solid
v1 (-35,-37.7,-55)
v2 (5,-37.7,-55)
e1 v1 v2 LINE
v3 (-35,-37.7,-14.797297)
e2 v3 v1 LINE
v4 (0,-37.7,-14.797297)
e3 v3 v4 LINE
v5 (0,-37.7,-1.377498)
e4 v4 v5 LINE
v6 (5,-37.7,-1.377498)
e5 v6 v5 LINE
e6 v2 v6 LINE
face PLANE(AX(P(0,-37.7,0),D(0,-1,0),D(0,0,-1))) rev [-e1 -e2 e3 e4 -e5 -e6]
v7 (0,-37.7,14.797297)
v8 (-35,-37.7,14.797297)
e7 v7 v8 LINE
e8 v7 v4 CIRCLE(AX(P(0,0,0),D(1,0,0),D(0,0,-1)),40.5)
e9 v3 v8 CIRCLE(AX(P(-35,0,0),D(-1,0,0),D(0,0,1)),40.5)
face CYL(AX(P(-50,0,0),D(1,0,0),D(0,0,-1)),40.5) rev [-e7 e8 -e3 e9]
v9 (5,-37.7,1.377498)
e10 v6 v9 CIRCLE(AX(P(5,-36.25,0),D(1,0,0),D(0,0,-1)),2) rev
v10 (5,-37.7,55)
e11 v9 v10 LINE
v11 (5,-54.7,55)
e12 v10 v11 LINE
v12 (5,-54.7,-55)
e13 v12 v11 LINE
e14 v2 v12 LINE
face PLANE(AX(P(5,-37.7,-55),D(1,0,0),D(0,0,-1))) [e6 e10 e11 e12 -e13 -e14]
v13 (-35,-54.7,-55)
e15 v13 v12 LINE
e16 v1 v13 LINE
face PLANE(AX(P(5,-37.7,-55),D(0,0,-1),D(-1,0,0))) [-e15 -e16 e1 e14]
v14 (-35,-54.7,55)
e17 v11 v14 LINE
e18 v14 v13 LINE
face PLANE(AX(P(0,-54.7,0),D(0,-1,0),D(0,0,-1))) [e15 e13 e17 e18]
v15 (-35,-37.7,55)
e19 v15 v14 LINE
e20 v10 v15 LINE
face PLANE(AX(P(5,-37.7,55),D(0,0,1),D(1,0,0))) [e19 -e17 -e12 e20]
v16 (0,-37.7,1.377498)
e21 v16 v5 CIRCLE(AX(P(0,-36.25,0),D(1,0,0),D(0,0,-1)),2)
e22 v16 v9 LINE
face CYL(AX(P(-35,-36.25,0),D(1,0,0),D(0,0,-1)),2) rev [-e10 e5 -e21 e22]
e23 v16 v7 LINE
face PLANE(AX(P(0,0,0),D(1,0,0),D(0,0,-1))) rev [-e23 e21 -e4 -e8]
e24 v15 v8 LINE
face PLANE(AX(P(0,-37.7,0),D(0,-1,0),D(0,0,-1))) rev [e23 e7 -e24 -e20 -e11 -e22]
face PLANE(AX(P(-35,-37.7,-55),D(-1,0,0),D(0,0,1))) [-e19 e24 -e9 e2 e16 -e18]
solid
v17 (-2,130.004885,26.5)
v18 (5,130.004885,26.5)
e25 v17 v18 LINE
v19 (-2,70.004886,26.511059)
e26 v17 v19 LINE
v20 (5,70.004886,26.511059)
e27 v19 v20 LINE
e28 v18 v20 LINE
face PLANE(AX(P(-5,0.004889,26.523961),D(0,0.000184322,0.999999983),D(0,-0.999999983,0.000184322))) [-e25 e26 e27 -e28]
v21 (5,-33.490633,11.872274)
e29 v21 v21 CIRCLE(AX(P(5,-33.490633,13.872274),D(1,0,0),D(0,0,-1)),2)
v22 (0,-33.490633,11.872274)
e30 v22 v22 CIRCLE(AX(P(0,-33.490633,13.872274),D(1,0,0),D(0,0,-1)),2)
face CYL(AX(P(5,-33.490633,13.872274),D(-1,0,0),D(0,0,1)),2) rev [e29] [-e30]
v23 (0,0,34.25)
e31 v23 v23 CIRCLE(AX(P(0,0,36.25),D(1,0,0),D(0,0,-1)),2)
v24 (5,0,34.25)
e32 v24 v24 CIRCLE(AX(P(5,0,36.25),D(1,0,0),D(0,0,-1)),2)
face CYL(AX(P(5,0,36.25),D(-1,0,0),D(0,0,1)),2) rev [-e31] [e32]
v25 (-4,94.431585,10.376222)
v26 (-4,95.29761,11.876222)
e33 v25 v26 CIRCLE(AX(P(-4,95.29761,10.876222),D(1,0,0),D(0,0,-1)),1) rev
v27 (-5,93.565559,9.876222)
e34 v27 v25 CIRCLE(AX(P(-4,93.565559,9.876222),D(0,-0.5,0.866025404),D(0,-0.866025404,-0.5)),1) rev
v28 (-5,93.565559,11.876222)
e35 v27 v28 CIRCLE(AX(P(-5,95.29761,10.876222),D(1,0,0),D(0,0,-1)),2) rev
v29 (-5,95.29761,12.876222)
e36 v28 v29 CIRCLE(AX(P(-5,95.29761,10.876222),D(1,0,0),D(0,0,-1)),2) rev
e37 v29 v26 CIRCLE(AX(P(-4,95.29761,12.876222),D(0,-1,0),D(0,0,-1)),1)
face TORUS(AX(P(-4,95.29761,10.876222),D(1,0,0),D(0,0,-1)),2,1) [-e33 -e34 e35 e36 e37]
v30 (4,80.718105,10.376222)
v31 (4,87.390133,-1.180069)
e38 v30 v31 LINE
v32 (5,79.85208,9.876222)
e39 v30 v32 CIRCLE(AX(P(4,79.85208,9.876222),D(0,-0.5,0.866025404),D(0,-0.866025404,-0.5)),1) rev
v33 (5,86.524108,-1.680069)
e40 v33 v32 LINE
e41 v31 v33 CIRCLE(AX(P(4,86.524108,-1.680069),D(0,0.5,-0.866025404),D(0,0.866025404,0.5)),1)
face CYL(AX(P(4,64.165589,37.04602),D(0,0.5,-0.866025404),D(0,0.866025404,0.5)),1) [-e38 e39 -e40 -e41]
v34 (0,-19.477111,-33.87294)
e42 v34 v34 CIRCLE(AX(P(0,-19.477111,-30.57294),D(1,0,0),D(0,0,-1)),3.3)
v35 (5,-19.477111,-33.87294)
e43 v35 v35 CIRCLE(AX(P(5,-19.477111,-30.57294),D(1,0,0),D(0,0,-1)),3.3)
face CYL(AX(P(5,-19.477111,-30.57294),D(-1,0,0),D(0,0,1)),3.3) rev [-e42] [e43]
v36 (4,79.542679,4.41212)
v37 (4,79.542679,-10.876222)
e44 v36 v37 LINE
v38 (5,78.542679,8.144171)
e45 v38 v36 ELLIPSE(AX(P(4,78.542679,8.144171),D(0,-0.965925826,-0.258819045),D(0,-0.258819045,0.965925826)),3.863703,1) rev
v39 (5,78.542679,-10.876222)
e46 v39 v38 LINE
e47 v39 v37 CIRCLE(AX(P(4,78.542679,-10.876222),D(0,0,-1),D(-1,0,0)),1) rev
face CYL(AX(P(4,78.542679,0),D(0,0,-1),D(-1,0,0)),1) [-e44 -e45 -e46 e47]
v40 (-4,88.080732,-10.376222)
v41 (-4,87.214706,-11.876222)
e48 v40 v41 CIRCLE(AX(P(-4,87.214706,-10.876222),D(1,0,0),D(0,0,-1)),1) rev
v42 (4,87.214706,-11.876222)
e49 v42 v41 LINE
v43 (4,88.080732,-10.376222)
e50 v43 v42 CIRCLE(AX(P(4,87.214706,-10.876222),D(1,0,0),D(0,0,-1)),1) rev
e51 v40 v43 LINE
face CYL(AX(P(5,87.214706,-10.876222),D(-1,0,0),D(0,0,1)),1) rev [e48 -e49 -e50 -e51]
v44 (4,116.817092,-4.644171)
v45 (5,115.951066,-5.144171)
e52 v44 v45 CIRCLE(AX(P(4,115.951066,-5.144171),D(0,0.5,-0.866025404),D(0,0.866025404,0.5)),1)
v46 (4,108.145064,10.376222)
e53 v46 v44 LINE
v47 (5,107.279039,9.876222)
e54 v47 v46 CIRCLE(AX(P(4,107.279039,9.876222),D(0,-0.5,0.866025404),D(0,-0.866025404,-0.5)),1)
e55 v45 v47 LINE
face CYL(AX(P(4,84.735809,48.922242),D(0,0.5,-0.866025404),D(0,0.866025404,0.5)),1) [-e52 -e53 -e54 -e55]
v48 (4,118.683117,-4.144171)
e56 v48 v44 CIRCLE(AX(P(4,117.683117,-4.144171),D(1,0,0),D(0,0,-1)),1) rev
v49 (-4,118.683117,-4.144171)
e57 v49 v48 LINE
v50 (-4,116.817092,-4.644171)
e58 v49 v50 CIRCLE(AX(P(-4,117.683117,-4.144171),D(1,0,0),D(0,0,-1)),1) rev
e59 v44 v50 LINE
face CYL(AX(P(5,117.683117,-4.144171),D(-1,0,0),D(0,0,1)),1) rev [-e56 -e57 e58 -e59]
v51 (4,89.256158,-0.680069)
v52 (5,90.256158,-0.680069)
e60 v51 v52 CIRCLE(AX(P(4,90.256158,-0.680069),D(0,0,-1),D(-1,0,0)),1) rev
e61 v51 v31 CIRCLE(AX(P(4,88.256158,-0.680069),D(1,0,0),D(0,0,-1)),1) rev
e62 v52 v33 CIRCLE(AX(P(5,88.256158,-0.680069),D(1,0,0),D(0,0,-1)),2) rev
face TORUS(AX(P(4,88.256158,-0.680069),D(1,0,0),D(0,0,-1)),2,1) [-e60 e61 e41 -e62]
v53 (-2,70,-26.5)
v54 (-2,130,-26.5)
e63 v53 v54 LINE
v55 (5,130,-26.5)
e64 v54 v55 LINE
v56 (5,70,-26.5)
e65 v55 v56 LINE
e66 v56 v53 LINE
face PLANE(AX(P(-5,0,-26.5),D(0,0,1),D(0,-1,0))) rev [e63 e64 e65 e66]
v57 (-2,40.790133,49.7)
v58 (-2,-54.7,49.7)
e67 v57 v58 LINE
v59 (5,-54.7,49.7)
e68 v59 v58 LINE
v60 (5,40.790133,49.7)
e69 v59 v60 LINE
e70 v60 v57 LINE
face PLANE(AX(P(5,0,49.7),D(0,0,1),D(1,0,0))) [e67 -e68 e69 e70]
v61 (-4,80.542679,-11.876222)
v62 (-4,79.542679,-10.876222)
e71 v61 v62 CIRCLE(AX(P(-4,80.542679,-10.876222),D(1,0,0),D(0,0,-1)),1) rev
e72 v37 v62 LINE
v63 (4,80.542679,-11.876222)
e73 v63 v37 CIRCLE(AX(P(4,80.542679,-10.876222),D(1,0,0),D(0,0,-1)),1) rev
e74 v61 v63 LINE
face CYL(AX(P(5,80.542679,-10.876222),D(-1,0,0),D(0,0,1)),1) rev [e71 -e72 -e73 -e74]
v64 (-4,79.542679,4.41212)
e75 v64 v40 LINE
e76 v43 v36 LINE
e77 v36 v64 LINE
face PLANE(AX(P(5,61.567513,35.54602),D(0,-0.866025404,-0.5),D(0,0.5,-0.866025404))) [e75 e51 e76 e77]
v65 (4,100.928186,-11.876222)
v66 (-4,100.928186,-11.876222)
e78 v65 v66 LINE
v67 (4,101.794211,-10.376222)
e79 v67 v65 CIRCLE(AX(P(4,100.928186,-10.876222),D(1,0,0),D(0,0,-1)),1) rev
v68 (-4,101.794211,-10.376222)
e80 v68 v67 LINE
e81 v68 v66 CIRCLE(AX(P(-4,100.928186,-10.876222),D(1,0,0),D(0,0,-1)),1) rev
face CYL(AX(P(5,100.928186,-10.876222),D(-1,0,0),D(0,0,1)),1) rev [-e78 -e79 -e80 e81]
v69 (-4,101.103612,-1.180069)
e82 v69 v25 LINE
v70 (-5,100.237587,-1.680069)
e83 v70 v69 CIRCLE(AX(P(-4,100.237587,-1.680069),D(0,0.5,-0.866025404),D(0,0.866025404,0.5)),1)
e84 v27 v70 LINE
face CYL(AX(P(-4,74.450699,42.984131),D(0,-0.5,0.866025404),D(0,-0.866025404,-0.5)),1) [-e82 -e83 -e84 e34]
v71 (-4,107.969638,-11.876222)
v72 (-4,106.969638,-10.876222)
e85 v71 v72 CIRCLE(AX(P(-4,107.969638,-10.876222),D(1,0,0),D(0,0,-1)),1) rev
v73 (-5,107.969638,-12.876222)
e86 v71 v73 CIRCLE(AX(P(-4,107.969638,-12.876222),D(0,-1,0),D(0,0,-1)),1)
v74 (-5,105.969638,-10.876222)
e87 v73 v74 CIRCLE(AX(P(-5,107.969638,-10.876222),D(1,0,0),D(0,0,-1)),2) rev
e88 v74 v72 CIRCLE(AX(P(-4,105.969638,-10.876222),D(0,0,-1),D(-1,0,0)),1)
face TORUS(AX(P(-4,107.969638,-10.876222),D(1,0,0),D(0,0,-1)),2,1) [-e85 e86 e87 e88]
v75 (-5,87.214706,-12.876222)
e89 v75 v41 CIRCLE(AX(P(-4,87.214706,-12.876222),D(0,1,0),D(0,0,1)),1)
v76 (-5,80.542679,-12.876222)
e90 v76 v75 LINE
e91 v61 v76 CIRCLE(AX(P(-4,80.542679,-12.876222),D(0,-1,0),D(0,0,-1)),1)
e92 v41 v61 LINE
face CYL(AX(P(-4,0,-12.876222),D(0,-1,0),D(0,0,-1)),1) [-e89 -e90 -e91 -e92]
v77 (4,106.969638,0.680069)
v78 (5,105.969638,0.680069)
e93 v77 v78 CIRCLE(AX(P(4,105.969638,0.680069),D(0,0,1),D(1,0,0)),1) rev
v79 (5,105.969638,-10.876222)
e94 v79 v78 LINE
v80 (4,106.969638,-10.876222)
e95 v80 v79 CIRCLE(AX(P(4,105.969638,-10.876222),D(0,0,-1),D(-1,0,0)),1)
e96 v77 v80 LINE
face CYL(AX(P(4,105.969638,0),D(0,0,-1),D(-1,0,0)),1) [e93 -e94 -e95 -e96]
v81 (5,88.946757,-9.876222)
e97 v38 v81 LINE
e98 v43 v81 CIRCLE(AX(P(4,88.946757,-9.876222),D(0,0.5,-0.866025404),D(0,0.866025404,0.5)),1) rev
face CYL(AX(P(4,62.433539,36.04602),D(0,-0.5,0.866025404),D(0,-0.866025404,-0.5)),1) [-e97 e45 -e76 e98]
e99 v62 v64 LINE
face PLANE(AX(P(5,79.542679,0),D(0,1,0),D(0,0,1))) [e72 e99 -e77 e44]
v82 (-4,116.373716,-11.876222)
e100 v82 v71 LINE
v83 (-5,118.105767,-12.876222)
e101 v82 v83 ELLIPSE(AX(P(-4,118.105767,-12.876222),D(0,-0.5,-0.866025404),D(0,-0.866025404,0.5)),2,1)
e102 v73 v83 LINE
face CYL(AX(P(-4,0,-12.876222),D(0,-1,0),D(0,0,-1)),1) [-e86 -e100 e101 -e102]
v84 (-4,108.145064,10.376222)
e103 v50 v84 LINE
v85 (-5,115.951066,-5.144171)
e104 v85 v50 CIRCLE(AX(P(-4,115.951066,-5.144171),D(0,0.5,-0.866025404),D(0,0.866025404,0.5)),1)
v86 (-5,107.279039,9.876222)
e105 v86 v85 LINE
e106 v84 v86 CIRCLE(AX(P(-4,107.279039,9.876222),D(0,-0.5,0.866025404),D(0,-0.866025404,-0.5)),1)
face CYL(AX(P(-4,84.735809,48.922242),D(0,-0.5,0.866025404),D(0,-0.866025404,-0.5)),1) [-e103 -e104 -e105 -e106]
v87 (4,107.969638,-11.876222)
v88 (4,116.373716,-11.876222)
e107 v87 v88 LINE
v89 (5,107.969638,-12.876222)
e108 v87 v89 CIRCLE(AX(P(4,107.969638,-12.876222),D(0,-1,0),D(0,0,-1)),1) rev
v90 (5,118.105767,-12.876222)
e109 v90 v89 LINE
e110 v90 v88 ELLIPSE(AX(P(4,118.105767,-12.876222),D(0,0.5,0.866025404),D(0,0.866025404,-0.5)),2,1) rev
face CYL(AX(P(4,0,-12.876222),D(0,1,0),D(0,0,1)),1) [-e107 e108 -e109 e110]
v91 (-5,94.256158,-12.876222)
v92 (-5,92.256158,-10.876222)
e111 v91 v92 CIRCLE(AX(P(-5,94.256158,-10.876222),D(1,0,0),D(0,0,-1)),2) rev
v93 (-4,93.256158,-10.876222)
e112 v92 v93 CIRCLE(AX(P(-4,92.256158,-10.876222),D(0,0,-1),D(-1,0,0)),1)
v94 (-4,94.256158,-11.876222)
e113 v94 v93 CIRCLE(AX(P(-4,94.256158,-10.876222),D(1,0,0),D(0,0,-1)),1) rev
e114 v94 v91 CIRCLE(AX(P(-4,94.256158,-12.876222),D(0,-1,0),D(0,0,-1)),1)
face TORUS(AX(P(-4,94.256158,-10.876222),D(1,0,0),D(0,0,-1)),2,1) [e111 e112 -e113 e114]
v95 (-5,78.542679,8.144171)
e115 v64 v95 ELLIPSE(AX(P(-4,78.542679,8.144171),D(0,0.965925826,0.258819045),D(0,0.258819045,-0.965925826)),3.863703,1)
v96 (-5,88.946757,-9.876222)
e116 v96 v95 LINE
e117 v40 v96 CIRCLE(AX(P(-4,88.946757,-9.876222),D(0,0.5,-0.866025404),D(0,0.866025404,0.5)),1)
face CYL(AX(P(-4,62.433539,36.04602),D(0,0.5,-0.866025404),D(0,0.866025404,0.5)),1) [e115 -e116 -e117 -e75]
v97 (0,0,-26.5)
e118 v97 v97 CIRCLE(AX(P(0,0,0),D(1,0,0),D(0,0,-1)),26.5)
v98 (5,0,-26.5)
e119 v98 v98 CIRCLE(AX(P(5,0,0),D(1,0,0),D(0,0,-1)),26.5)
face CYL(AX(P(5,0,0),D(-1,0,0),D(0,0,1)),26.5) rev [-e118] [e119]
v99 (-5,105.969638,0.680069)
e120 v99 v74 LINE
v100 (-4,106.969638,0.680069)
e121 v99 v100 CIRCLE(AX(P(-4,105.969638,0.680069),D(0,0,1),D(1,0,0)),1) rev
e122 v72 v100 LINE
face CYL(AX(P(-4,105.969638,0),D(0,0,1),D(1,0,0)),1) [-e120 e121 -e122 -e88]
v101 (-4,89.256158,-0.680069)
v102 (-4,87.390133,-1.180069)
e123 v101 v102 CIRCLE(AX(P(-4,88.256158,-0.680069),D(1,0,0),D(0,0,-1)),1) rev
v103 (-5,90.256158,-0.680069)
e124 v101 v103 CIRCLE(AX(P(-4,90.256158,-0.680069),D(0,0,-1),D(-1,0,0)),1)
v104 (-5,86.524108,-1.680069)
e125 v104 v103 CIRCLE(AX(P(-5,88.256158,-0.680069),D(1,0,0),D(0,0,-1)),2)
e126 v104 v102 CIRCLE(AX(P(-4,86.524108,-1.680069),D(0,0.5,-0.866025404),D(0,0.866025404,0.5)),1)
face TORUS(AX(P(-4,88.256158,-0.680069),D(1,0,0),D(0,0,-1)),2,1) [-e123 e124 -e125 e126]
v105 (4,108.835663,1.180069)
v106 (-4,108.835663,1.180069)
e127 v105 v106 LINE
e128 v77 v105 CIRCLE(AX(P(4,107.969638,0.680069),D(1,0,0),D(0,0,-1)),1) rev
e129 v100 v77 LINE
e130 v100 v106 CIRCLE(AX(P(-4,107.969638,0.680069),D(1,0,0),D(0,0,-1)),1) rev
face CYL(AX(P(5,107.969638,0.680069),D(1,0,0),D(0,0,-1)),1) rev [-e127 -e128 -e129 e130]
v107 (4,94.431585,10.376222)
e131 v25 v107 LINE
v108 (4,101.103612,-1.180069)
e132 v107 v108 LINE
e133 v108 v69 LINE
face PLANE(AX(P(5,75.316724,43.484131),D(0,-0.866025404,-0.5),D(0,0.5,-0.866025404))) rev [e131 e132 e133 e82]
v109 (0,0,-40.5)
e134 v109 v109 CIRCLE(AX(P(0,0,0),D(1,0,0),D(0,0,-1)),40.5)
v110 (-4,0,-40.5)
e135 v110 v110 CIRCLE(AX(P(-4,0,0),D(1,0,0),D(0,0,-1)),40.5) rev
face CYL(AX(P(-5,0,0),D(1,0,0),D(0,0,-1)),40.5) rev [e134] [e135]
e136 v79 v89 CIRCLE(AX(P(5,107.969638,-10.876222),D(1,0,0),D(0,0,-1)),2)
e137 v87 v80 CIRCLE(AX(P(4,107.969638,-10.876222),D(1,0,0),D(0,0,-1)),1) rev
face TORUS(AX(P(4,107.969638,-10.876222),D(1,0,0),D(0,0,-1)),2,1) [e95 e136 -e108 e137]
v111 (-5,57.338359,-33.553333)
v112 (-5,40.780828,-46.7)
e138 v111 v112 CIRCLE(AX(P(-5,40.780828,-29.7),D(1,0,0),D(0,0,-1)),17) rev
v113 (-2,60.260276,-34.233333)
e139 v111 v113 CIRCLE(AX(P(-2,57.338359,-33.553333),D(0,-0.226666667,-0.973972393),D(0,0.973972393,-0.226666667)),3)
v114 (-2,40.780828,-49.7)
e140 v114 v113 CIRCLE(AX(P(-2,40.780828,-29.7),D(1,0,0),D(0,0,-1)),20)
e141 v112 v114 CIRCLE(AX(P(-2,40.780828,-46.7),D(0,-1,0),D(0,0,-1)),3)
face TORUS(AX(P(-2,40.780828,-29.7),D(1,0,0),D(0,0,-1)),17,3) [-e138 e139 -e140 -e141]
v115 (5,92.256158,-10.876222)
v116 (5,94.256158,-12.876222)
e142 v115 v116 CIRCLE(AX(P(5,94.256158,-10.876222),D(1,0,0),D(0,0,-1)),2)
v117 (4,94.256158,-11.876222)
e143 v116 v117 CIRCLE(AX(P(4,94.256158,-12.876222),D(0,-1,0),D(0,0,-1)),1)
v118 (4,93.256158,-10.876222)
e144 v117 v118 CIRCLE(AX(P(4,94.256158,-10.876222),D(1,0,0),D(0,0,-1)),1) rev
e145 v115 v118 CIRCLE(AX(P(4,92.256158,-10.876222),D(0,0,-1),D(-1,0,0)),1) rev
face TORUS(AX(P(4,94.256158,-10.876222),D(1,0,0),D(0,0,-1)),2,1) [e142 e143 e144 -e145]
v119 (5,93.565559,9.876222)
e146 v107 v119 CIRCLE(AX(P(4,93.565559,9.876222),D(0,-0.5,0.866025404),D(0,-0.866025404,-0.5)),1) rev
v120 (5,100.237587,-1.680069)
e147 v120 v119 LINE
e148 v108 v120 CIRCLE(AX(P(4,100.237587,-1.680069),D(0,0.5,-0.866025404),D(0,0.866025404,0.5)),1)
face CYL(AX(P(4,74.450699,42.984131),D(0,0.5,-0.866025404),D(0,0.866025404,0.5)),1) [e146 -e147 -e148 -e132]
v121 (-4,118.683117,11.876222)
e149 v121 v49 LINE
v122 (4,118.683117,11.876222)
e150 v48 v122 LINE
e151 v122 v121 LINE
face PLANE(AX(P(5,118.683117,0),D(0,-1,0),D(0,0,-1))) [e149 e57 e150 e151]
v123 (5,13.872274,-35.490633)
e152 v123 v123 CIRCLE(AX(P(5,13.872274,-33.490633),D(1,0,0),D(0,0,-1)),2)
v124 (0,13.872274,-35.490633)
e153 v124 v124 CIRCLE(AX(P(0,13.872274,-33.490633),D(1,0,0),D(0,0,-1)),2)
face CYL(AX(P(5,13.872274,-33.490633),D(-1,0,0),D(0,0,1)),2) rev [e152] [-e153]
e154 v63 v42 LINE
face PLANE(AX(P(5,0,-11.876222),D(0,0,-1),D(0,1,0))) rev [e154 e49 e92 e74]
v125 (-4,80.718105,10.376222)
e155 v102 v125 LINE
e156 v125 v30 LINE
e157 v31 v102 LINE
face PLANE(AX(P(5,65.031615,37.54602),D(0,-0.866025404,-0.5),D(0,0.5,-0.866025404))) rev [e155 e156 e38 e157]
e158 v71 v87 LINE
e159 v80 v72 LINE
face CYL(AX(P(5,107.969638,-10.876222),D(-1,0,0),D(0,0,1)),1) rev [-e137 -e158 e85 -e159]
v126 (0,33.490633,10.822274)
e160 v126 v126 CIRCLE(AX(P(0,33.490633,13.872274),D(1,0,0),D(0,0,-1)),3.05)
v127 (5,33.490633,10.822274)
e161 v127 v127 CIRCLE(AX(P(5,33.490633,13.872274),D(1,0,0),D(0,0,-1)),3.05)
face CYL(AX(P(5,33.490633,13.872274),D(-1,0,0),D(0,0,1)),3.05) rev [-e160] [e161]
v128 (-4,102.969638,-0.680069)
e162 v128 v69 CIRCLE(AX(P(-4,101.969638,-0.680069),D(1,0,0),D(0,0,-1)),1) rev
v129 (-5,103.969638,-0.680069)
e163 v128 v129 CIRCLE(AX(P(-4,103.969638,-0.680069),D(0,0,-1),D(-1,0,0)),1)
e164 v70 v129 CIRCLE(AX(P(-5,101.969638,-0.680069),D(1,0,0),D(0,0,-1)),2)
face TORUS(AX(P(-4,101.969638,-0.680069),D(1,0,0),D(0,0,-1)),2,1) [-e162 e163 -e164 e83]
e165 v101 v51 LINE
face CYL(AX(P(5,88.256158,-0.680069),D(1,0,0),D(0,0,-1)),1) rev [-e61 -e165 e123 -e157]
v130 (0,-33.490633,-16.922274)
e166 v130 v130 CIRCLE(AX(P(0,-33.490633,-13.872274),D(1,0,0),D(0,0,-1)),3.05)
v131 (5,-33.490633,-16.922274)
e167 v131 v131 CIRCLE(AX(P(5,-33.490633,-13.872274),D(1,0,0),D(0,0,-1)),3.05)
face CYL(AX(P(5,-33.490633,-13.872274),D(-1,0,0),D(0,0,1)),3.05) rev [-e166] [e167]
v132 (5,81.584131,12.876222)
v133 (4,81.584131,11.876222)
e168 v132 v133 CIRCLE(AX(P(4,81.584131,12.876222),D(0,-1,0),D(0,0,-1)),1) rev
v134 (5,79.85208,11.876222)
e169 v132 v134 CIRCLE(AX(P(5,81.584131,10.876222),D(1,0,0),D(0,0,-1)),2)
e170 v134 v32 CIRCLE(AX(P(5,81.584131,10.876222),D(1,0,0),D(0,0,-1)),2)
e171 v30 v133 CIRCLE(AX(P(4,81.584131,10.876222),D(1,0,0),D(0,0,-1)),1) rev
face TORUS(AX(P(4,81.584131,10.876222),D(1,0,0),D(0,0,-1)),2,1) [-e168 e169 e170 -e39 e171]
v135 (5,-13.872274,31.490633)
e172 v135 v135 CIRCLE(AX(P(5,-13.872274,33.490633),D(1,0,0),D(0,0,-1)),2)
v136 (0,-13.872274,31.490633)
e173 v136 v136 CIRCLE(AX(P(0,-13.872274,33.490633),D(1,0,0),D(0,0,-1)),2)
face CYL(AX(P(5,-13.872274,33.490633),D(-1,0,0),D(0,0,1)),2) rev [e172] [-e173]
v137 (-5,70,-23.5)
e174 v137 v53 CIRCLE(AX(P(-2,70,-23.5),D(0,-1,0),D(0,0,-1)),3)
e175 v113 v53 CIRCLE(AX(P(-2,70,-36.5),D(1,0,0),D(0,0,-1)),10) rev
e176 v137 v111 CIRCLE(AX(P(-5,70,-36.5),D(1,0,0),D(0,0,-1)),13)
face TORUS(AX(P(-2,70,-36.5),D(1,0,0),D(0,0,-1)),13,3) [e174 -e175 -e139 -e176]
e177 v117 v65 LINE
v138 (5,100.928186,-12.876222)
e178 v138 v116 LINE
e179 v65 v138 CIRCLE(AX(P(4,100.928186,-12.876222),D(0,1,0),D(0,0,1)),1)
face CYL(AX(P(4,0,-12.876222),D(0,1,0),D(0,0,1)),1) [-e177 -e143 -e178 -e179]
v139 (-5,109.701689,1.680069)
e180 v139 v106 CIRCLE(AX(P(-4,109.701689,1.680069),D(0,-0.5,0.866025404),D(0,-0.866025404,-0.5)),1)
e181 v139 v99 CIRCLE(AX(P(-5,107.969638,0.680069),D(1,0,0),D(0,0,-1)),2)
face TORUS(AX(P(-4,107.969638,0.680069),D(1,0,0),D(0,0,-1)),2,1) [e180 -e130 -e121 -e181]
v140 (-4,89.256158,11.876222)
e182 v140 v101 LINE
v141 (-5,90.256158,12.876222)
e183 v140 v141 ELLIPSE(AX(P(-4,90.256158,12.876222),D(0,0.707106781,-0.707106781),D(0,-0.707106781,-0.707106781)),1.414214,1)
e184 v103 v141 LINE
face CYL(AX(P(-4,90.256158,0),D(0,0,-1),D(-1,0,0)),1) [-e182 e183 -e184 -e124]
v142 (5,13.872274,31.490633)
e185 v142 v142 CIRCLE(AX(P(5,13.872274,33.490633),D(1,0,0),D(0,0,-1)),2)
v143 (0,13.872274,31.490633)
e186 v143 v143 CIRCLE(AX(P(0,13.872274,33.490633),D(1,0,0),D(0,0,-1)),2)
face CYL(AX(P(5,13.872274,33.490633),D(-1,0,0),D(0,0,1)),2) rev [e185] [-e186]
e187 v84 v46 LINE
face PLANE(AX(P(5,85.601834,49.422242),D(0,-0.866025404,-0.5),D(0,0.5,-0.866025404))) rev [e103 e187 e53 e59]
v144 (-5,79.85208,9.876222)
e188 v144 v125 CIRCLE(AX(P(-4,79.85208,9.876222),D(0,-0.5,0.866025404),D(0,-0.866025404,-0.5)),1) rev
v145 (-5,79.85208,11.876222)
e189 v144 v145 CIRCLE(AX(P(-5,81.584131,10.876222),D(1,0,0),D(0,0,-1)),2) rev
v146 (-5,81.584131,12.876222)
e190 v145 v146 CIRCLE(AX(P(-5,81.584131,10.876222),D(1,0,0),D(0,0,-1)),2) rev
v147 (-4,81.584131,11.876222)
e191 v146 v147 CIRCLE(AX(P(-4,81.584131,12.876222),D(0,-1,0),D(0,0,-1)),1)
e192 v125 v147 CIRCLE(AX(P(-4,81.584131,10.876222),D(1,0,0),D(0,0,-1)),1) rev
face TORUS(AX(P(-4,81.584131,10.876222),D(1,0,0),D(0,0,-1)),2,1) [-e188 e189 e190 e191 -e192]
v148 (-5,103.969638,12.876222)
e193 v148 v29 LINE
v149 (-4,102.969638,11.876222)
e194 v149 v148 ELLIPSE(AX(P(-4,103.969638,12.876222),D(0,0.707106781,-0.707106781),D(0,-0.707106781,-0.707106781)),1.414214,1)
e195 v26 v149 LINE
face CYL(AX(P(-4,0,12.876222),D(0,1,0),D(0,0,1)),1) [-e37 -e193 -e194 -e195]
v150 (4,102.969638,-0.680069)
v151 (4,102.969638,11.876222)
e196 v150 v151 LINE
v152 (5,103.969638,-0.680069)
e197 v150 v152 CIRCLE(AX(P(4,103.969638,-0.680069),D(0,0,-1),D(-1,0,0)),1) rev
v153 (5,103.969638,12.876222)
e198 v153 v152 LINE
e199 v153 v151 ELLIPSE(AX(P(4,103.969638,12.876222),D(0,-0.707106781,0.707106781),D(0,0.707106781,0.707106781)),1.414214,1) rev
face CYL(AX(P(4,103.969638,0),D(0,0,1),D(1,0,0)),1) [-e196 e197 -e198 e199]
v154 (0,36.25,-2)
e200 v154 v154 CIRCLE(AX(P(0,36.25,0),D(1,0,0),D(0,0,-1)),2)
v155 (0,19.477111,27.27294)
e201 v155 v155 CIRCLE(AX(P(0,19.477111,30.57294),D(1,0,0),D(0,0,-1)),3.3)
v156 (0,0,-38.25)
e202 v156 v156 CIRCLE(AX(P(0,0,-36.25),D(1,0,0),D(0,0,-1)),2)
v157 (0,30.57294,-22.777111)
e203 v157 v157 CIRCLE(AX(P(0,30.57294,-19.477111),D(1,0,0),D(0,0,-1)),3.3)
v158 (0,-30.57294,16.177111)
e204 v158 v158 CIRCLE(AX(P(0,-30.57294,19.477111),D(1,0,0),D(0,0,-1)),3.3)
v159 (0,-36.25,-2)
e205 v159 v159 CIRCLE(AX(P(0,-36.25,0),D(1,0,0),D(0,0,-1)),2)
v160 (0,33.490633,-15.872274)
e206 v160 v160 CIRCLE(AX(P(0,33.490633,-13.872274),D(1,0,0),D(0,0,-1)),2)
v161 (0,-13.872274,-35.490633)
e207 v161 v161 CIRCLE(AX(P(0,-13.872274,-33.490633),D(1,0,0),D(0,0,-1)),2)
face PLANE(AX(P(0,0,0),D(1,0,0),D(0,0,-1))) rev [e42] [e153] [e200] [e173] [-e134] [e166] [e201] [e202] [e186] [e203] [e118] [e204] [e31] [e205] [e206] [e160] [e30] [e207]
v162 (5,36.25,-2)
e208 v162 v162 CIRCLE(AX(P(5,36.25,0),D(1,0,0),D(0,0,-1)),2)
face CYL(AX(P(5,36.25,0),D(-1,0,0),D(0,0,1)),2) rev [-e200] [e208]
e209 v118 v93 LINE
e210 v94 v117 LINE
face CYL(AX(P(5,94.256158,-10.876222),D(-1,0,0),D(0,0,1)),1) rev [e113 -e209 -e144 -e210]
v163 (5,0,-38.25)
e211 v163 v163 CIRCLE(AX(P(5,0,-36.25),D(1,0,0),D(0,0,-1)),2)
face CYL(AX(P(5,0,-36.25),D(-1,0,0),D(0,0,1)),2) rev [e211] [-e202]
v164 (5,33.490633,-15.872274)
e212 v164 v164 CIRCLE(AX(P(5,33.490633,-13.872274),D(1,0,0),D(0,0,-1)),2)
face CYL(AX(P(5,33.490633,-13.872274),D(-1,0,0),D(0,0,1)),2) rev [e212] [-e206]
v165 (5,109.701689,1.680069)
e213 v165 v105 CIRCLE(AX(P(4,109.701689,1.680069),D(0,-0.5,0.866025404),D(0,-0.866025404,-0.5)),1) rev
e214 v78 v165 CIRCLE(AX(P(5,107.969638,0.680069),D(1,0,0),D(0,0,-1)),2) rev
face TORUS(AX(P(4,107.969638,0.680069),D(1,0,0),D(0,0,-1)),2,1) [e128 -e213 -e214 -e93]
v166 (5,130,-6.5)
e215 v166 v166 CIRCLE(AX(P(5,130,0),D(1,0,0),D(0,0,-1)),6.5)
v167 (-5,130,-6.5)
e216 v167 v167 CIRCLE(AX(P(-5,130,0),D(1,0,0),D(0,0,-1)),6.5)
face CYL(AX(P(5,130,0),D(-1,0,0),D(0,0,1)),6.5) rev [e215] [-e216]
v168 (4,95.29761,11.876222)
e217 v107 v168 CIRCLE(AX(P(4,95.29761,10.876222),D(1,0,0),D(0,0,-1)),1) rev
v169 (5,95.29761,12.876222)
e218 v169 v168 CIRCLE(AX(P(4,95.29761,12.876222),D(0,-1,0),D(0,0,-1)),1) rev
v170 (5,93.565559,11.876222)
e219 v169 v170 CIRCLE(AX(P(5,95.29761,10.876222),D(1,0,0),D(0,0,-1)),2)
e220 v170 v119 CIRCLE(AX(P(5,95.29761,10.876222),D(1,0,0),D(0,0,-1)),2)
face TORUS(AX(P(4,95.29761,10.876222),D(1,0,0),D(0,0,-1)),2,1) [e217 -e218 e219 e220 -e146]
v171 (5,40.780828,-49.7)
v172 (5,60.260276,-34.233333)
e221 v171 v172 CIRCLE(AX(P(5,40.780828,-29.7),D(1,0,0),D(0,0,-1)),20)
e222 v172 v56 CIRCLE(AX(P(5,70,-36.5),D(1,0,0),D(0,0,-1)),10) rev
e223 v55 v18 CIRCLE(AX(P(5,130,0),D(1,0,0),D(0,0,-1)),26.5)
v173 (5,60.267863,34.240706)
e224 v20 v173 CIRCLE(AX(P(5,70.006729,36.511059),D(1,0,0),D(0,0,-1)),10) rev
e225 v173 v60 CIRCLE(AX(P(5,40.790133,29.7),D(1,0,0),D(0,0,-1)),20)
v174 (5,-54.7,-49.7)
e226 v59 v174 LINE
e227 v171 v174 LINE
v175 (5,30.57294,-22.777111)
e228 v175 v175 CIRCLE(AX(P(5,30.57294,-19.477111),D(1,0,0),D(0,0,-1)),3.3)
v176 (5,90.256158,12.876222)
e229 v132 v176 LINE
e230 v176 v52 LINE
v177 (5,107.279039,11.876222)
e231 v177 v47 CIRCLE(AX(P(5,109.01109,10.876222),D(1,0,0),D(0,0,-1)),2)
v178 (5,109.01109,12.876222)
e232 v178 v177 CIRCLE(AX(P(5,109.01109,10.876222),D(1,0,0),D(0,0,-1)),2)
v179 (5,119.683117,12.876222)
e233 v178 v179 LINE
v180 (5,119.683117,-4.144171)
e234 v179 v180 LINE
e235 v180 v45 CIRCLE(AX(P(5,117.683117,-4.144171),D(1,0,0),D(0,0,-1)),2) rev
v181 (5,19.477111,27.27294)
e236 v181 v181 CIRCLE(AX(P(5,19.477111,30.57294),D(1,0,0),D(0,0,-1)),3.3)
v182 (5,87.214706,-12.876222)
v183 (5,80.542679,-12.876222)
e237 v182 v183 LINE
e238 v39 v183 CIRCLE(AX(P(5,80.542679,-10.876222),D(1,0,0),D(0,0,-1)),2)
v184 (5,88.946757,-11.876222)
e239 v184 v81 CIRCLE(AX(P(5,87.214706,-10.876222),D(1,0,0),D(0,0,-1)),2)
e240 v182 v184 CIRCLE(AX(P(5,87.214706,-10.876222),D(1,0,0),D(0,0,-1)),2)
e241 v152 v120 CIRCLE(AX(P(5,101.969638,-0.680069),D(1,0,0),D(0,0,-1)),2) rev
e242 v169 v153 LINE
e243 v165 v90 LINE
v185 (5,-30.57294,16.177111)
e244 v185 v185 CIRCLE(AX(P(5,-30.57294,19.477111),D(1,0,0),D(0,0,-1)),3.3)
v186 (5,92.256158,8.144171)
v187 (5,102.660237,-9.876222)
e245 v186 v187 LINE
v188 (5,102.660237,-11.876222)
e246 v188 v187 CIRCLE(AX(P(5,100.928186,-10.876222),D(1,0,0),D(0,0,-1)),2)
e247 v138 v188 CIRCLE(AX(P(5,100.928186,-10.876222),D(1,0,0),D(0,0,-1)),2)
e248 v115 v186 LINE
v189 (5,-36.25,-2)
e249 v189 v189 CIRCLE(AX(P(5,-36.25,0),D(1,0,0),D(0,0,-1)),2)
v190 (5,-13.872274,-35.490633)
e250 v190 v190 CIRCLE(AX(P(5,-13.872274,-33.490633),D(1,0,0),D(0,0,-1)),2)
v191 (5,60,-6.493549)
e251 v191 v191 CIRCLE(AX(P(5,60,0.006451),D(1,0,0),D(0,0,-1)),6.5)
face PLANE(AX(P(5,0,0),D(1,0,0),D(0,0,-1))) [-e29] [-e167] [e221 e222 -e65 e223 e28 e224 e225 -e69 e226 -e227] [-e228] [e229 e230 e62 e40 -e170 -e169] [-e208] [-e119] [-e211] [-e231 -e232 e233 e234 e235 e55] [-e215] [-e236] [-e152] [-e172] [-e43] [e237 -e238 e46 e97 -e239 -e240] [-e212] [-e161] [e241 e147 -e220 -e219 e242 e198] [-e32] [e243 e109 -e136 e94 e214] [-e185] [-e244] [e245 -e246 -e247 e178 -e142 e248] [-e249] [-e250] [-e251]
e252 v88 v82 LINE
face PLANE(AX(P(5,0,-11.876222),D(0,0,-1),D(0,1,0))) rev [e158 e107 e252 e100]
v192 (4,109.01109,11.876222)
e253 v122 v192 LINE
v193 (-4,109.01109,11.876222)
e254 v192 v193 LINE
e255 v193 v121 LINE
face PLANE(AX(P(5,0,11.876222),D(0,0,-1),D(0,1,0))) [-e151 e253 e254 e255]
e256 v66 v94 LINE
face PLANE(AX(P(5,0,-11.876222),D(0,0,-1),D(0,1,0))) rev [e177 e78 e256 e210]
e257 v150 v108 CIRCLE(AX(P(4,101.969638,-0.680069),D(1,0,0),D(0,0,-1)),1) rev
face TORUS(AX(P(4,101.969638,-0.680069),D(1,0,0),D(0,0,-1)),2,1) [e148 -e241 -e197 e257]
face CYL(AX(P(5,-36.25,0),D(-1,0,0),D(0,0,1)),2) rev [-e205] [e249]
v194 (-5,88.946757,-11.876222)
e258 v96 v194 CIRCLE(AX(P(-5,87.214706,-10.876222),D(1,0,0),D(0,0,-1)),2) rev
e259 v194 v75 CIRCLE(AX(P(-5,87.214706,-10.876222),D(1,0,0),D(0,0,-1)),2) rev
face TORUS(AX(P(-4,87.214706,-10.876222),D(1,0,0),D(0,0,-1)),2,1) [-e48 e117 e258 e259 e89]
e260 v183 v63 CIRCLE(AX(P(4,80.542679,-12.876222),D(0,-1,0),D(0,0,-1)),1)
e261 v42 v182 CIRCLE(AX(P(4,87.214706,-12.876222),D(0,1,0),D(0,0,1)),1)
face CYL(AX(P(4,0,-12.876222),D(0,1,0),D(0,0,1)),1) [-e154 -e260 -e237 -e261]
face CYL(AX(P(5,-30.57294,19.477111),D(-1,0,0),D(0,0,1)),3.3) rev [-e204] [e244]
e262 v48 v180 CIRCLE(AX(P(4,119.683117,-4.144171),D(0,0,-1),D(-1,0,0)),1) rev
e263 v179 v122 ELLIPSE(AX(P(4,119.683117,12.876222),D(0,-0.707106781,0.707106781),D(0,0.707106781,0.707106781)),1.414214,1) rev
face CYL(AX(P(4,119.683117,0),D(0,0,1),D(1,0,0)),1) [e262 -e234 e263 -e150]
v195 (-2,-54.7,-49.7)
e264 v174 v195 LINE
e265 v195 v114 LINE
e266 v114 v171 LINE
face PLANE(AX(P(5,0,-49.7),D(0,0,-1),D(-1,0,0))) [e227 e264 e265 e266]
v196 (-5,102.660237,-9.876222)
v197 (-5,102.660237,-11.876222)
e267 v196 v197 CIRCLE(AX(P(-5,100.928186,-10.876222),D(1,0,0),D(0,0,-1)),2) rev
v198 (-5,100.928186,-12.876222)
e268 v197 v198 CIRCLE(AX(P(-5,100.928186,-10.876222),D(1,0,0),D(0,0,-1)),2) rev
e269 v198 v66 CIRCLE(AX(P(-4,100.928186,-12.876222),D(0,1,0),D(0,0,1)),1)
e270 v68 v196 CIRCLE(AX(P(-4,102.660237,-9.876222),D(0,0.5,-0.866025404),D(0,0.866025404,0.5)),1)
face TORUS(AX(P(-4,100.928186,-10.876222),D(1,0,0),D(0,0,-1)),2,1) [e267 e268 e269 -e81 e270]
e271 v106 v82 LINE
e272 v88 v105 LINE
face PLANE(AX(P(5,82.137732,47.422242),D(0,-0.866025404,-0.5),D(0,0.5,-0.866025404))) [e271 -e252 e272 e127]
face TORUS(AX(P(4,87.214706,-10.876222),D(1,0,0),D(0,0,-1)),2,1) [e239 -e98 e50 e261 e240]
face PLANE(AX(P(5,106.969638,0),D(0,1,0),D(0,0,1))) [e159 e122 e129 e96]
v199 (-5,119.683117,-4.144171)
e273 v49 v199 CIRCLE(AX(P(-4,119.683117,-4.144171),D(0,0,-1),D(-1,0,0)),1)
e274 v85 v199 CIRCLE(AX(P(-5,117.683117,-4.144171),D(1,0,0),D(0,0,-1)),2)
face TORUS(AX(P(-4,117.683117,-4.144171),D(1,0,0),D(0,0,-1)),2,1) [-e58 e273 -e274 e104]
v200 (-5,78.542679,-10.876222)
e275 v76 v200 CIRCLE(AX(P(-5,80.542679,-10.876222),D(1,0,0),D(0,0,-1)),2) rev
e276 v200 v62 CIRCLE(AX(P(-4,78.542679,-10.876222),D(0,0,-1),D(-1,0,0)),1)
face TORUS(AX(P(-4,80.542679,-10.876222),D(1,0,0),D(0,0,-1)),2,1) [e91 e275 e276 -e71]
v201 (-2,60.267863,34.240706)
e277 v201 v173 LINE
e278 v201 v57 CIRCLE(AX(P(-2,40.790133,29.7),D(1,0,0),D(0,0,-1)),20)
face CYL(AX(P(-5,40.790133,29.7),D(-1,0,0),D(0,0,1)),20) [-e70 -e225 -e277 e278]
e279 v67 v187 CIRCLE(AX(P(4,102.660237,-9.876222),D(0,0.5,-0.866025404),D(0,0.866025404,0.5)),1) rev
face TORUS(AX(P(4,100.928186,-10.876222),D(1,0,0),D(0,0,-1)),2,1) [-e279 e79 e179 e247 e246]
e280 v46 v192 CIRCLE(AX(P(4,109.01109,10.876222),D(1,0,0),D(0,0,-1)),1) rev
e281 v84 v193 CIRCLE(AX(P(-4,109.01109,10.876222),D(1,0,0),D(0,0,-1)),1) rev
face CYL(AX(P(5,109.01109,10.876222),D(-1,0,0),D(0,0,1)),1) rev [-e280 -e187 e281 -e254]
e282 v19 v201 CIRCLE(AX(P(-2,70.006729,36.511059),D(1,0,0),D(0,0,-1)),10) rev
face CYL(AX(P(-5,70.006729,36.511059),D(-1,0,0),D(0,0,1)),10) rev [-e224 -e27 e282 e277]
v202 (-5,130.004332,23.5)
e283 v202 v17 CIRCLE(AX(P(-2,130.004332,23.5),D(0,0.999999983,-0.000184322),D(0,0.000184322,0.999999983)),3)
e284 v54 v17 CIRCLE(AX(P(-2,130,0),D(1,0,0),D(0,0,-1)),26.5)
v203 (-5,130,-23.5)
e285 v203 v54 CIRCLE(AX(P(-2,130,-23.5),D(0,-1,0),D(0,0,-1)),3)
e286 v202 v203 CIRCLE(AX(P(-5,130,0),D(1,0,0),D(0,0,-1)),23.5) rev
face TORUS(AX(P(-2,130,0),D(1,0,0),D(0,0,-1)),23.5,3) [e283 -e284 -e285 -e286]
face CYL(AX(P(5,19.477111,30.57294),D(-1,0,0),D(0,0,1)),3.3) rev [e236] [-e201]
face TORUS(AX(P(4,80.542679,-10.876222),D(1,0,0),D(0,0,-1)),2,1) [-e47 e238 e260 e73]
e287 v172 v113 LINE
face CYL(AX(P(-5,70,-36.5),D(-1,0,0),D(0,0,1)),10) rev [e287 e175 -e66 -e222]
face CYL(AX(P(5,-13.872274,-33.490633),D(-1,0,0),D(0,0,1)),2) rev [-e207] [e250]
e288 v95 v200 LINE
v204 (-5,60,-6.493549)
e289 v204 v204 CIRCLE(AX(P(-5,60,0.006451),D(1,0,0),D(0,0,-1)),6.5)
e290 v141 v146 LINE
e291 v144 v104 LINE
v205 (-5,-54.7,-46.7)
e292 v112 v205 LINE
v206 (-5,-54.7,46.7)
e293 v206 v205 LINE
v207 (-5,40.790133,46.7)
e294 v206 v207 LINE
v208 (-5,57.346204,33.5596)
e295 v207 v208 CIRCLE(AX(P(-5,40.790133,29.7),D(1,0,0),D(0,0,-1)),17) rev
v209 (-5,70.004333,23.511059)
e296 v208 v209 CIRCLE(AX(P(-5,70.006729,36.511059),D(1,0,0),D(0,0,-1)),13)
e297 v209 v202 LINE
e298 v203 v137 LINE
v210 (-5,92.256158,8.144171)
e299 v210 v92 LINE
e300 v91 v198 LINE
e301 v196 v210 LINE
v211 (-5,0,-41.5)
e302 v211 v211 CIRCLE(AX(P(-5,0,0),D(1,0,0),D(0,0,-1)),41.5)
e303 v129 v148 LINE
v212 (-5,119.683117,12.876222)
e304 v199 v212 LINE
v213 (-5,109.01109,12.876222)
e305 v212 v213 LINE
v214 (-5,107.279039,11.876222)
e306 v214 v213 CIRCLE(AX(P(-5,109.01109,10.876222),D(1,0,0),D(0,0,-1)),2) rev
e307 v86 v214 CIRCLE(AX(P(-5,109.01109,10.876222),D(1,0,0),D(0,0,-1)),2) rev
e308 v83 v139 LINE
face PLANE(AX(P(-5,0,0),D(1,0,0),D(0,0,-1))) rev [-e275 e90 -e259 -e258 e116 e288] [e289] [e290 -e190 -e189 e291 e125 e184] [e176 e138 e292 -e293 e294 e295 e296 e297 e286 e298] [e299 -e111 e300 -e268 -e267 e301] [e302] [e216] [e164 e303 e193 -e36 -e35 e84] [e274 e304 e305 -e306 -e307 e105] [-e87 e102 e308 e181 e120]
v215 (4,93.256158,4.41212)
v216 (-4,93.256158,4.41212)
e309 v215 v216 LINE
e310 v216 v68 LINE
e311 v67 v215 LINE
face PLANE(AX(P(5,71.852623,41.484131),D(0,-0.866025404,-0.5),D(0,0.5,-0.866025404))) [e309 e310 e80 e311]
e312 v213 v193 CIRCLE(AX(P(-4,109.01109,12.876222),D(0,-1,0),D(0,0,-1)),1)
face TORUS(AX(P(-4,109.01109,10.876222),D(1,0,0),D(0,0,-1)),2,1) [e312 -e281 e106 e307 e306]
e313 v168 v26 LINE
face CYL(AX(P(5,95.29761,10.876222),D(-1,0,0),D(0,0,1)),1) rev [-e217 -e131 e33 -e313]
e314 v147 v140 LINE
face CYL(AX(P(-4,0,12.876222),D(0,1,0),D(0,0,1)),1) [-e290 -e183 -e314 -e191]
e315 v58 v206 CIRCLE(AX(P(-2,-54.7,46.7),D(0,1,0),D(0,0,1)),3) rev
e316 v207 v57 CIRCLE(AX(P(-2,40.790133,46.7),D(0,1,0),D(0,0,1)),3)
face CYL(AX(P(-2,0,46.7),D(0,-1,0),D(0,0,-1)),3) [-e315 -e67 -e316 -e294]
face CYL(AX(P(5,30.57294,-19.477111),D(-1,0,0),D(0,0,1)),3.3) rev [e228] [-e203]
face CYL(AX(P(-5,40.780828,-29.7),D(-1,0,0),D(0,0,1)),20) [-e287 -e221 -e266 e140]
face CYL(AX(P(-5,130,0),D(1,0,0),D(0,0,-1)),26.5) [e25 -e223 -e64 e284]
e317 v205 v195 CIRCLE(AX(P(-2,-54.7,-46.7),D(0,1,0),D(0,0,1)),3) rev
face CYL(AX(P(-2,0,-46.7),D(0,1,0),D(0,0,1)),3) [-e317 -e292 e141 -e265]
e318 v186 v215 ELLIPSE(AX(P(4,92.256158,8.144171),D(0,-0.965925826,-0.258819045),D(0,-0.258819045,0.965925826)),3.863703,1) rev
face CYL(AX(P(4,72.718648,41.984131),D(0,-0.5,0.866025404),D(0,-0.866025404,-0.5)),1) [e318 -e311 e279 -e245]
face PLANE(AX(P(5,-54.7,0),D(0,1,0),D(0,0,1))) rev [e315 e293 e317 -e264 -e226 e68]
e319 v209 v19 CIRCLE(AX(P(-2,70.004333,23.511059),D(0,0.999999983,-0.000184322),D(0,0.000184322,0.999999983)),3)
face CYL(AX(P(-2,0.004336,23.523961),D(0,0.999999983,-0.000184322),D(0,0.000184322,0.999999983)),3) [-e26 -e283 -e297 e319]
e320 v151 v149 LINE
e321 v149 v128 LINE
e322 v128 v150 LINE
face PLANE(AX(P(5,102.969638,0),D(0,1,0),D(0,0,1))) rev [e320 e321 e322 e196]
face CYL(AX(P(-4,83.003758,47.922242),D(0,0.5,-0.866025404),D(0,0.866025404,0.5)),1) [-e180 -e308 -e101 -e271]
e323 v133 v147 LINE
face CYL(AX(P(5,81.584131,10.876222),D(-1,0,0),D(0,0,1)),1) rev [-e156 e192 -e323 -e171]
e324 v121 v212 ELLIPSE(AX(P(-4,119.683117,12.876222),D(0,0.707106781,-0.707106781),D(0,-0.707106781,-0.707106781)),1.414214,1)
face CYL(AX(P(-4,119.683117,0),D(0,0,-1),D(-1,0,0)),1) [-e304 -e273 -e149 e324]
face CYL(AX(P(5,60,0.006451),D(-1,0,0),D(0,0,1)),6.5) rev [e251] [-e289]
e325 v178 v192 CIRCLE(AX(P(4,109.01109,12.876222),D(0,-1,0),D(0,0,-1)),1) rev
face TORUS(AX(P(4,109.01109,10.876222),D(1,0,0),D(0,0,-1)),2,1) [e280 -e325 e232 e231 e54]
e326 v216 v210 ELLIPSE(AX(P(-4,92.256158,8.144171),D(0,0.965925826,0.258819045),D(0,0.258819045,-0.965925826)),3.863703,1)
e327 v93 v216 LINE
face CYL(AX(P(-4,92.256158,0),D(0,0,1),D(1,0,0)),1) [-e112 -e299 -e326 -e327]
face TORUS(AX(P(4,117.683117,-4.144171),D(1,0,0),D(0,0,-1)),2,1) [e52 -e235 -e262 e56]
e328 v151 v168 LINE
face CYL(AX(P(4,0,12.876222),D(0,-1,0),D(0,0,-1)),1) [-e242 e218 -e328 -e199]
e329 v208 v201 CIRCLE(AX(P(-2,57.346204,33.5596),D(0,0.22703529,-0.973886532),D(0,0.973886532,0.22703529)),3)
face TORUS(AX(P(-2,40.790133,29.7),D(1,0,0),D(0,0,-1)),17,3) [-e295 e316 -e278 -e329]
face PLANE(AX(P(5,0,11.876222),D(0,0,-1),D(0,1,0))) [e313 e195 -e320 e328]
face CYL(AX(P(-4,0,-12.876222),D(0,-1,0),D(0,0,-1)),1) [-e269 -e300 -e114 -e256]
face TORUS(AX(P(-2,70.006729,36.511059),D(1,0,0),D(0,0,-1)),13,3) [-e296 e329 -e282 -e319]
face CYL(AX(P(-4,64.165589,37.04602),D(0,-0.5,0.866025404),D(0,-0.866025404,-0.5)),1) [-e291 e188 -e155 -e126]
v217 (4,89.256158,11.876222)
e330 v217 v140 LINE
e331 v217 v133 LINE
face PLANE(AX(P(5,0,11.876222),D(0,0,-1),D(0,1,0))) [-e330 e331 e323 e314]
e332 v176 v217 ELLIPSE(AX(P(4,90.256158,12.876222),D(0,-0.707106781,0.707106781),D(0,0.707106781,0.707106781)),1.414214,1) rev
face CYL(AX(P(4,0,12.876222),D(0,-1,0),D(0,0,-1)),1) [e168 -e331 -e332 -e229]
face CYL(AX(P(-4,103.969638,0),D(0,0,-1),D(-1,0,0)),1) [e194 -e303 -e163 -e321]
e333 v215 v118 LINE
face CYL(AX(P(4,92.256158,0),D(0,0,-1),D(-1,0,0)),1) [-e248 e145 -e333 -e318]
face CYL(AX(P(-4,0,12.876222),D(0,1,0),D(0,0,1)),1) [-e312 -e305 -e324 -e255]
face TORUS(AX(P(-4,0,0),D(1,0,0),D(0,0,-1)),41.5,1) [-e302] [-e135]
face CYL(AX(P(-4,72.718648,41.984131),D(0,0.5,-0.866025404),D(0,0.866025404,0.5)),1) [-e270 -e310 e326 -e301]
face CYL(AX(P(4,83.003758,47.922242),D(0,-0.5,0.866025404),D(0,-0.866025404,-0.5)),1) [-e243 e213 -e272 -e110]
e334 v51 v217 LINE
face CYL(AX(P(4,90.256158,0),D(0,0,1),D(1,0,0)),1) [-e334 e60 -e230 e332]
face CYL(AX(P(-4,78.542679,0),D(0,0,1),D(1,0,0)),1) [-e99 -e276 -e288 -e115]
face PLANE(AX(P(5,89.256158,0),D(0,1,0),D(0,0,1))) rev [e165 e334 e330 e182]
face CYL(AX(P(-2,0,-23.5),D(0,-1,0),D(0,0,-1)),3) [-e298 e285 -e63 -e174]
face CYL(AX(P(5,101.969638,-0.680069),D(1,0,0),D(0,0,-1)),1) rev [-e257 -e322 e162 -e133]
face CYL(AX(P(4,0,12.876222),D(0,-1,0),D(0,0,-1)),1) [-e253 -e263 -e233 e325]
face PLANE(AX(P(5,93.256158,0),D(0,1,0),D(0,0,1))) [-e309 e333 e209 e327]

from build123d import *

# Parameters (mm, degrees)
SKETCH2_R           = 6.5
SKETCH2_R_2         = 40.5
BOSS_EXTRUDE1_DEPTH = 5
BOSS_EXTRUDE2_START = -5
SKETCH2_5_R         = 6.5
SKETCH2_5_R_2       = 40.5
BOSS_EXTRUDE2_DEPTH = 5
BOSS_EXTRUDE3_DEPTH = 17
CUT_EXTRUDE8_START  = -35
CUT_EXTRUDE8_DEPTH  = 35
CUT_EXTRUDE9_DEPTH  = 193.138205467
CUT_EXTRUDE10_START = -10
CUT_EXTRUDE10_DEPTH = 10
FILLET1_R           = 10
FILLET2_R           = 20
FILLET3_R           = 1
FILLET4_R           = 3
CUT_EXTRUDE11_DEPTH = 10
FILLET5_R           = 1


# Read off the part's stored shape, not the designer's step: Cut-Extrude8
with BuildPart() as part:
    # Sketch2 → Boss-Extrude1 (new body)
    # profile 1 of 2: a face of its own
    with BuildSketch(Plane(origin=(0, 0, 0), x_dir=(0, 0, -1), z_dir=(1, 0, 0))):
        with BuildLine():
            Line((-49.7, 130), (-49.7, 0))
            Line((-49.7, 0), (-49.7, -54.7))
            Line((-49.7, -54.7), (49.7, -54.7))
            Line((49.7, -54.7), (49.7, 30))
            Line((49.7, 30), (49.7, 130))
            ThreePointArc((49.7, 130), (0, 179.7), (-49.7, 130))
        make_face()
        with Locations((-0.006451274, 60)):
            Circle(SKETCH2_R, mode=Mode.SUBTRACT)
        Circle(SKETCH2_R_2, mode=Mode.SUBTRACT)
        with Locations((0, 130)):
            Circle(SKETCH2_R, mode=Mode.SUBTRACT)
    # profile 2 of 2: a face of its own
    with BuildSketch(Plane(origin=(0, 0, 0), x_dir=(0, 0, -1), z_dir=(1, 0, 0))):
        Circle(SKETCH2_R_2)
        with BuildLine():
            ThreePointArc((-32.076419491, -12.458060861), (-32.076419491, -15.286487986), (-34.904846616, -15.286487986))
            ThreePointArc((-34.904846616, -15.286487986), (-34.904846616, -12.458060861), (-32.076419491, -12.458060861))
        make_face(mode=Mode.SUBTRACT)
        with BuildLine():
            ThreePointArc((-34.835786438, 1.414213562), (-34.835786438, -1.414213562), (-37.664213562, -1.414213562))
            ThreePointArc((-37.664213562, -1.414213562), (-37.664213562, 1.414213562), (-34.835786438, 1.414213562))
        make_face(mode=Mode.SUBTRACT)
        with BuildLine():
            ThreePointArc((-21.81056318, -32.906392289), (-21.81056318, -28.239487533), (-17.143658425, -28.239487533))
            ThreePointArc((-17.143658425, -28.239487533), (-17.143658425, -32.906392289), (-21.81056318, -32.906392289))
        make_face(mode=Mode.SUBTRACT)
        with BuildLine():
            ThreePointArc((-15.286487986, -34.904846616), (-15.286487986, -32.076419491), (-12.458060861, -32.076419491))
            ThreePointArc((-12.458060861, -32.076419491), (-12.458060861, -34.904846616), (-15.286487986, -34.904846616))
        make_face(mode=Mode.SUBTRACT)
        with BuildLine():
            ThreePointArc((-34.904846616, 12.458060861), (-34.904846616, 15.286487986), (-32.076419491, 15.286487986))
            ThreePointArc((-32.076419491, 15.286487986), (-32.076419491, 12.458060861), (-34.904846616, 12.458060861))
        make_face(mode=Mode.SUBTRACT)
        with BuildLine():
            ThreePointArc((-32.906392289, 17.143658425), (-32.906392289, 21.81056318), (-28.239487533, 21.81056318))
            ThreePointArc((-28.239487533, 21.81056318), (-28.239487533, 17.143658425), (-32.906392289, 17.143658425))
        make_face(mode=Mode.SUBTRACT)
        with BuildLine():
            ThreePointArc((-11.715598741, 35.647308736), (-11.715598741, 31.333957371), (-16.028950106, 31.333957371))
            ThreePointArc((-16.028950106, 31.333957371), (-16.028950106, 35.647308736), (-11.715598741, 35.647308736))
        make_face(mode=Mode.SUBTRACT)
        with BuildLine():
            ThreePointArc((1.414213562, 37.664213562), (1.414213562, 34.835786438), (-1.414213562, 34.835786438))
            ThreePointArc((-1.414213562, 34.835786438), (-1.414213562, 37.664213562), (1.414213562, 37.664213562))
        make_face(mode=Mode.SUBTRACT)
        with BuildLine():
            ThreePointArc((1.414213562, -34.835786438), (1.414213562, -37.664213562), (-1.414213562, -37.664213562))
            ThreePointArc((-1.414213562, -37.664213562), (-1.414213562, -34.835786438), (1.414213562, -34.835786438))
        make_face(mode=Mode.SUBTRACT)
        with BuildLine():
            ThreePointArc((11.715598741, -35.647308736), (11.715598741, -31.333957371), (16.028950106, -31.333957371))
            ThreePointArc((16.028950106, -31.333957371), (16.028950106, -35.647308736), (11.715598741, -35.647308736))
        make_face(mode=Mode.SUBTRACT)
        with BuildLine():
            ThreePointArc((20.900199859, -16.292073099), (-16.292073099, -20.900199859), (-20.900199859, 16.292073099))
            ThreePointArc((-20.900199859, 16.292073099), (16.292073099, 20.900199859), (20.900199859, -16.292073099))
        make_face(mode=Mode.SUBTRACT)
        with BuildLine():
            ThreePointArc((28.239487533, -21.81056318), (28.239487533, -17.143658425), (32.906392289, -17.143658425))
            ThreePointArc((32.906392289, -17.143658425), (32.906392289, -21.81056318), (28.239487533, -21.81056318))
        make_face(mode=Mode.SUBTRACT)
        with BuildLine():
            ThreePointArc((34.904846616, -12.458060861), (34.904846616, -15.286487986), (32.076419491, -15.286487986))
            ThreePointArc((32.076419491, -15.286487986), (32.076419491, -12.458060861), (34.904846616, -12.458060861))
        make_face(mode=Mode.SUBTRACT)
        with BuildLine():
            ThreePointArc((37.664213562, 1.414213562), (37.664213562, -1.414213562), (34.835786438, -1.414213562))
            ThreePointArc((34.835786438, -1.414213562), (34.835786438, 1.414213562), (37.664213562, 1.414213562))
        make_face(mode=Mode.SUBTRACT)
        with BuildLine():
            ThreePointArc((17.143658425, 28.239487533), (17.143658425, 32.906392289), (21.81056318, 32.906392289))
            ThreePointArc((21.81056318, 32.906392289), (21.81056318, 28.239487533), (17.143658425, 28.239487533))
        make_face(mode=Mode.SUBTRACT)
        with BuildLine():
            ThreePointArc((12.458060861, 32.076419491), (12.458060861, 34.904846616), (15.286487986, 34.904846616))
            ThreePointArc((15.286487986, 34.904846616), (15.286487986, 32.076419491), (12.458060861, 32.076419491))
        make_face(mode=Mode.SUBTRACT)
        with BuildLine():
            ThreePointArc((34.904846616, 15.286487986), (34.904846616, 12.458060861), (32.076419491, 12.458060861))
            ThreePointArc((32.076419491, 12.458060861), (32.076419491, 15.286487986), (34.904846616, 15.286487986))
        make_face(mode=Mode.SUBTRACT)
    extrude(amount=BOSS_EXTRUDE1_DEPTH)

    # Sketch2_5 → Boss-Extrude2 (add)
    with BuildSketch(Plane(origin=(0, 0, 0), x_dir=(0, 0, -1), z_dir=(1, 0, 0)).offset(BOSS_EXTRUDE2_START)):
        with BuildLine():
            Line((-49.7, 130), (-49.7, 0))
            Line((-49.7, 0), (-49.7, -54.7))
            Line((-49.7, -54.7), (49.7, -54.7))
            Line((49.7, -54.7), (49.7, 30))
            Line((49.7, 30), (49.7, 130))
            ThreePointArc((49.7, 130), (0, 179.7), (-49.7, 130))
        make_face()
        with Locations((-0.006451274, 60)):
            Circle(SKETCH2_5_R, mode=Mode.SUBTRACT)
        Circle(SKETCH2_5_R_2, mode=Mode.SUBTRACT)
        with Locations((0, 130)):
            Circle(SKETCH2_5_R, mode=Mode.SUBTRACT)
    extrude(amount=BOSS_EXTRUDE2_DEPTH)

    # Sketch8 → Cut-Extrude10 (cut)
    with BuildSketch(Plane(origin=(5, 0, 0), x_dir=(0, 0, -1), z_dir=(1, 0, 0)).offset(CUT_EXTRUDE10_START)):
        with BuildLine():
            Line((26.5, 60), (49.7, 60))
            Line((49.7, 60), (49.7, 130))
            ThreePointArc((49.7, 130), (0, 179.7), (-49.7, 130))
            Line((-49.7, 130), (-49.7, 60.009159619))
            Line((-49.7, 60.009159619), (-26.512902097, 60.004885725))
            Line((-26.512902097, 60.004885725), (-26.49999955, 130.004884536))
            ThreePointArc((-26.49999955, 130.004884536), (0.002442268, 156.499999887), (26.5, 130))
            Line((26.5, 130), (26.5, 60))
        make_face()
    extrude(amount=CUT_EXTRUDE10_DEPTH, mode=Mode.SUBTRACT)

    # Fillet1
    fillet1_edges = [part.edges().sort_by_distance(p)[0] for p in [
        (0, 60.004885725, 26.512902097),
        (0, 60, -26.5),
    ]]
    fillet(fillet1_edges, radius=FILLET1_R)

    # Fillet2
    fillet2_edges = [part.edges().sort_by_distance(p)[0] for p in [
        (0, 60.009159619, 49.7),
        (0, 60, -49.7),
    ]]
    fillet(fillet2_edges, radius=FILLET2_R)

    # Fillet3
    fillet3_edges = [part.edges().sort_by_distance(p)[0] for p in [
        (-5, 0, 40.5),
    ]]
    fillet(fillet3_edges, radius=FILLET3_R)

    # Fillet4
    fillet4_edges = [part.edges().sort_by_distance(p)[0] for p in [
        (-5, 100, -26.5),
        (-5, 156.499999887, -0.002442268),
        (-5, 100.004885045, 26.505529213),
        (-5, 63.781747298, -28.668439917),
        (-5, 63.789236426, 28.678894964),
        (-5, -6.959585894, -49.7),
        (-5, 53.217333616, -45.363120166),
        (-5, 53.223673826, 45.365473438),
        (-5, -6.95493359, 49.7),
    ]]
    fillet(fillet4_edges, radius=FILLET4_R)

    # Sketch9 → Cut-Extrude11 (cut)
    with BuildSketch(Plane.ZY.offset(5)):
        Polygon((4.412119954, 106.969637748), (-11.876221569, 116.373716111), (-11.876221569, 106.969637748), align=None)
        Polygon((11.876221569, 118.683117188), (-7.876221569, 118.683117188), (11.876221569, 107.279038825), align=None)
        Polygon((11.876221569, 93.565559385), (11.876221569, 102.969637748), (-4.412119954, 102.969637748), align=None)
        Polygon((11.876221569, 79.852079945), (11.876221569, 89.256158309), (-4.412119954, 89.256158309), align=None)
        Polygon((4.412119954, 93.256158309), (-11.876221569, 102.660236672), (-11.876221569, 93.256158309), align=None)
        Polygon((4.412119954, 79.542678869), (-11.876221569, 88.946757232), (-11.876221569, 79.542678869), align=None)
    extrude(amount=-CUT_EXTRUDE11_DEPTH, mode=Mode.SUBTRACT)

    # Fillet5
    fillet5_edges = [part.edges().sort_by_distance(p)[0] for p in [
        (-5, 93.256158309, -3.732050808),
        (5, 97.95819749, -11.876221569),
        (0, 93.256158309, -11.876221569),
        (-5, 97.95819749, -3.732050808),
        (0, 102.660236672, -11.876221569),
        (5, 93.256158309, -3.732050808),
        (5, 97.95819749, -3.732050808),
        (-5, 97.95819749, -11.876221569),
        (5, 89.256158309, 3.732050808),
        (0, 89.256158309, -4.412119954),
        (-5, 84.554119127, 11.876221569),
        (5, 84.554119127, 3.732050808),
        (0, 79.852079945, 11.876221569),
        (5, 84.554119127, 11.876221569),
        (-5, 89.256158309, 3.732050808),
        (-5, 84.554119127, 3.732050808),
        (5, 102.969637748, 3.732050808),
        (0, 102.969637748, -4.412119954),
        (-5, 98.267598567, 11.876221569),
        (5, 98.267598567, 3.732050808),
        (0, 93.565559385, 11.876221569),
        (5, 98.267598567, 11.876221569),
        (-5, 102.969637748, 3.732050808),
        (-5, 98.267598567, 3.732050808),
        (-5, 118.683117188, 2),
        (0, 118.683117188, -7.876221569),
        (-5, 112.981078007, 11.876221569),
        (5, 112.981078007, 2),
        (0, 107.279038825, 11.876221569),
        (5, 118.683117188, 2),
        (5, 112.981078007, 11.876221569),
        (-5, 112.981078007, 2),
        (-5, 79.542678869, -3.732050808),
        (5, 84.24471805, -11.876221569),
        (0, 79.542678869, -11.876221569),
        (-5, 84.24471805, -3.732050808),
        (0, 88.946757232, -11.876221569),
        (5, 79.542678869, -3.732050808),
        (5, 84.24471805, -3.732050808),
        (-5, 84.24471805, -11.876221569),
        (-5, 106.969637748, -3.732050808),
        (0, 106.969637748, 4.412119954),
        (5, 111.67167693, -11.876221569),
        (0, 106.969637748, -11.876221569),
        (-5, 111.67167693, -3.732050808),
        (5, 106.969637748, -3.732050808),
        (5, 111.67167693, -3.732050808),
        (-5, 111.67167693, -11.876221569),
    ]]
    fillet(fillet5_edges, radius=FILLET5_R)


with BuildPart() as body_2:
    # Sketch3 → Boss-Extrude3 (new body)
    with BuildSketch(Plane(origin=(0, -54.7, 0), x_dir=(-1, 0, 0), z_dir=(0, -1, 0))):
        Polygon((-5, 55), (35, 55), (35, 0), (35, -55), (-5, -55), align=None)
    extrude(amount=-BOSS_EXTRUDE3_DEPTH)

    # Cut-Extrude8 outline → Cut-Extrude8 (cut)
    with BuildSketch(Plane(origin=(0, 0, 0), x_dir=(0, 0, -1), z_dir=(1, 0, 0)).offset(CUT_EXTRUDE8_START)):
        with BuildLine():
            ThreePointArc((1.377497731, -37.7), (0, -38.25), (-1.377497731, -37.7))
            Line((-1.377497731, -37.7), (-14.79729705, -37.7))
            ThreePointArc((-14.79729705, -37.7), (0, -40.5), (14.79729705, -37.7))
            Line((14.79729705, -37.7), (1.377497731, -37.7))
        make_face()
    extrude(amount=CUT_EXTRUDE8_DEPTH, mode=Mode.SUBTRACT)

    # Sketch7 → Cut-Extrude9 (cut, through all)
    with BuildSketch(Plane(origin=(5, 0, 0), x_dir=(0, 0, -1), z_dir=(1, 0, 0))):
        with BuildLine():
            Line((1.377497731, -37.7), (-1.377497731, -37.7))
            ThreePointArc((-1.377497731, -37.7), (0, -38.25), (1.377497731, -37.7))
        make_face()
    extrude(amount=-CUT_EXTRUDE9_DEPTH, mode=Mode.SUBTRACT)


solid = Compound([part.part, body_2.part])
